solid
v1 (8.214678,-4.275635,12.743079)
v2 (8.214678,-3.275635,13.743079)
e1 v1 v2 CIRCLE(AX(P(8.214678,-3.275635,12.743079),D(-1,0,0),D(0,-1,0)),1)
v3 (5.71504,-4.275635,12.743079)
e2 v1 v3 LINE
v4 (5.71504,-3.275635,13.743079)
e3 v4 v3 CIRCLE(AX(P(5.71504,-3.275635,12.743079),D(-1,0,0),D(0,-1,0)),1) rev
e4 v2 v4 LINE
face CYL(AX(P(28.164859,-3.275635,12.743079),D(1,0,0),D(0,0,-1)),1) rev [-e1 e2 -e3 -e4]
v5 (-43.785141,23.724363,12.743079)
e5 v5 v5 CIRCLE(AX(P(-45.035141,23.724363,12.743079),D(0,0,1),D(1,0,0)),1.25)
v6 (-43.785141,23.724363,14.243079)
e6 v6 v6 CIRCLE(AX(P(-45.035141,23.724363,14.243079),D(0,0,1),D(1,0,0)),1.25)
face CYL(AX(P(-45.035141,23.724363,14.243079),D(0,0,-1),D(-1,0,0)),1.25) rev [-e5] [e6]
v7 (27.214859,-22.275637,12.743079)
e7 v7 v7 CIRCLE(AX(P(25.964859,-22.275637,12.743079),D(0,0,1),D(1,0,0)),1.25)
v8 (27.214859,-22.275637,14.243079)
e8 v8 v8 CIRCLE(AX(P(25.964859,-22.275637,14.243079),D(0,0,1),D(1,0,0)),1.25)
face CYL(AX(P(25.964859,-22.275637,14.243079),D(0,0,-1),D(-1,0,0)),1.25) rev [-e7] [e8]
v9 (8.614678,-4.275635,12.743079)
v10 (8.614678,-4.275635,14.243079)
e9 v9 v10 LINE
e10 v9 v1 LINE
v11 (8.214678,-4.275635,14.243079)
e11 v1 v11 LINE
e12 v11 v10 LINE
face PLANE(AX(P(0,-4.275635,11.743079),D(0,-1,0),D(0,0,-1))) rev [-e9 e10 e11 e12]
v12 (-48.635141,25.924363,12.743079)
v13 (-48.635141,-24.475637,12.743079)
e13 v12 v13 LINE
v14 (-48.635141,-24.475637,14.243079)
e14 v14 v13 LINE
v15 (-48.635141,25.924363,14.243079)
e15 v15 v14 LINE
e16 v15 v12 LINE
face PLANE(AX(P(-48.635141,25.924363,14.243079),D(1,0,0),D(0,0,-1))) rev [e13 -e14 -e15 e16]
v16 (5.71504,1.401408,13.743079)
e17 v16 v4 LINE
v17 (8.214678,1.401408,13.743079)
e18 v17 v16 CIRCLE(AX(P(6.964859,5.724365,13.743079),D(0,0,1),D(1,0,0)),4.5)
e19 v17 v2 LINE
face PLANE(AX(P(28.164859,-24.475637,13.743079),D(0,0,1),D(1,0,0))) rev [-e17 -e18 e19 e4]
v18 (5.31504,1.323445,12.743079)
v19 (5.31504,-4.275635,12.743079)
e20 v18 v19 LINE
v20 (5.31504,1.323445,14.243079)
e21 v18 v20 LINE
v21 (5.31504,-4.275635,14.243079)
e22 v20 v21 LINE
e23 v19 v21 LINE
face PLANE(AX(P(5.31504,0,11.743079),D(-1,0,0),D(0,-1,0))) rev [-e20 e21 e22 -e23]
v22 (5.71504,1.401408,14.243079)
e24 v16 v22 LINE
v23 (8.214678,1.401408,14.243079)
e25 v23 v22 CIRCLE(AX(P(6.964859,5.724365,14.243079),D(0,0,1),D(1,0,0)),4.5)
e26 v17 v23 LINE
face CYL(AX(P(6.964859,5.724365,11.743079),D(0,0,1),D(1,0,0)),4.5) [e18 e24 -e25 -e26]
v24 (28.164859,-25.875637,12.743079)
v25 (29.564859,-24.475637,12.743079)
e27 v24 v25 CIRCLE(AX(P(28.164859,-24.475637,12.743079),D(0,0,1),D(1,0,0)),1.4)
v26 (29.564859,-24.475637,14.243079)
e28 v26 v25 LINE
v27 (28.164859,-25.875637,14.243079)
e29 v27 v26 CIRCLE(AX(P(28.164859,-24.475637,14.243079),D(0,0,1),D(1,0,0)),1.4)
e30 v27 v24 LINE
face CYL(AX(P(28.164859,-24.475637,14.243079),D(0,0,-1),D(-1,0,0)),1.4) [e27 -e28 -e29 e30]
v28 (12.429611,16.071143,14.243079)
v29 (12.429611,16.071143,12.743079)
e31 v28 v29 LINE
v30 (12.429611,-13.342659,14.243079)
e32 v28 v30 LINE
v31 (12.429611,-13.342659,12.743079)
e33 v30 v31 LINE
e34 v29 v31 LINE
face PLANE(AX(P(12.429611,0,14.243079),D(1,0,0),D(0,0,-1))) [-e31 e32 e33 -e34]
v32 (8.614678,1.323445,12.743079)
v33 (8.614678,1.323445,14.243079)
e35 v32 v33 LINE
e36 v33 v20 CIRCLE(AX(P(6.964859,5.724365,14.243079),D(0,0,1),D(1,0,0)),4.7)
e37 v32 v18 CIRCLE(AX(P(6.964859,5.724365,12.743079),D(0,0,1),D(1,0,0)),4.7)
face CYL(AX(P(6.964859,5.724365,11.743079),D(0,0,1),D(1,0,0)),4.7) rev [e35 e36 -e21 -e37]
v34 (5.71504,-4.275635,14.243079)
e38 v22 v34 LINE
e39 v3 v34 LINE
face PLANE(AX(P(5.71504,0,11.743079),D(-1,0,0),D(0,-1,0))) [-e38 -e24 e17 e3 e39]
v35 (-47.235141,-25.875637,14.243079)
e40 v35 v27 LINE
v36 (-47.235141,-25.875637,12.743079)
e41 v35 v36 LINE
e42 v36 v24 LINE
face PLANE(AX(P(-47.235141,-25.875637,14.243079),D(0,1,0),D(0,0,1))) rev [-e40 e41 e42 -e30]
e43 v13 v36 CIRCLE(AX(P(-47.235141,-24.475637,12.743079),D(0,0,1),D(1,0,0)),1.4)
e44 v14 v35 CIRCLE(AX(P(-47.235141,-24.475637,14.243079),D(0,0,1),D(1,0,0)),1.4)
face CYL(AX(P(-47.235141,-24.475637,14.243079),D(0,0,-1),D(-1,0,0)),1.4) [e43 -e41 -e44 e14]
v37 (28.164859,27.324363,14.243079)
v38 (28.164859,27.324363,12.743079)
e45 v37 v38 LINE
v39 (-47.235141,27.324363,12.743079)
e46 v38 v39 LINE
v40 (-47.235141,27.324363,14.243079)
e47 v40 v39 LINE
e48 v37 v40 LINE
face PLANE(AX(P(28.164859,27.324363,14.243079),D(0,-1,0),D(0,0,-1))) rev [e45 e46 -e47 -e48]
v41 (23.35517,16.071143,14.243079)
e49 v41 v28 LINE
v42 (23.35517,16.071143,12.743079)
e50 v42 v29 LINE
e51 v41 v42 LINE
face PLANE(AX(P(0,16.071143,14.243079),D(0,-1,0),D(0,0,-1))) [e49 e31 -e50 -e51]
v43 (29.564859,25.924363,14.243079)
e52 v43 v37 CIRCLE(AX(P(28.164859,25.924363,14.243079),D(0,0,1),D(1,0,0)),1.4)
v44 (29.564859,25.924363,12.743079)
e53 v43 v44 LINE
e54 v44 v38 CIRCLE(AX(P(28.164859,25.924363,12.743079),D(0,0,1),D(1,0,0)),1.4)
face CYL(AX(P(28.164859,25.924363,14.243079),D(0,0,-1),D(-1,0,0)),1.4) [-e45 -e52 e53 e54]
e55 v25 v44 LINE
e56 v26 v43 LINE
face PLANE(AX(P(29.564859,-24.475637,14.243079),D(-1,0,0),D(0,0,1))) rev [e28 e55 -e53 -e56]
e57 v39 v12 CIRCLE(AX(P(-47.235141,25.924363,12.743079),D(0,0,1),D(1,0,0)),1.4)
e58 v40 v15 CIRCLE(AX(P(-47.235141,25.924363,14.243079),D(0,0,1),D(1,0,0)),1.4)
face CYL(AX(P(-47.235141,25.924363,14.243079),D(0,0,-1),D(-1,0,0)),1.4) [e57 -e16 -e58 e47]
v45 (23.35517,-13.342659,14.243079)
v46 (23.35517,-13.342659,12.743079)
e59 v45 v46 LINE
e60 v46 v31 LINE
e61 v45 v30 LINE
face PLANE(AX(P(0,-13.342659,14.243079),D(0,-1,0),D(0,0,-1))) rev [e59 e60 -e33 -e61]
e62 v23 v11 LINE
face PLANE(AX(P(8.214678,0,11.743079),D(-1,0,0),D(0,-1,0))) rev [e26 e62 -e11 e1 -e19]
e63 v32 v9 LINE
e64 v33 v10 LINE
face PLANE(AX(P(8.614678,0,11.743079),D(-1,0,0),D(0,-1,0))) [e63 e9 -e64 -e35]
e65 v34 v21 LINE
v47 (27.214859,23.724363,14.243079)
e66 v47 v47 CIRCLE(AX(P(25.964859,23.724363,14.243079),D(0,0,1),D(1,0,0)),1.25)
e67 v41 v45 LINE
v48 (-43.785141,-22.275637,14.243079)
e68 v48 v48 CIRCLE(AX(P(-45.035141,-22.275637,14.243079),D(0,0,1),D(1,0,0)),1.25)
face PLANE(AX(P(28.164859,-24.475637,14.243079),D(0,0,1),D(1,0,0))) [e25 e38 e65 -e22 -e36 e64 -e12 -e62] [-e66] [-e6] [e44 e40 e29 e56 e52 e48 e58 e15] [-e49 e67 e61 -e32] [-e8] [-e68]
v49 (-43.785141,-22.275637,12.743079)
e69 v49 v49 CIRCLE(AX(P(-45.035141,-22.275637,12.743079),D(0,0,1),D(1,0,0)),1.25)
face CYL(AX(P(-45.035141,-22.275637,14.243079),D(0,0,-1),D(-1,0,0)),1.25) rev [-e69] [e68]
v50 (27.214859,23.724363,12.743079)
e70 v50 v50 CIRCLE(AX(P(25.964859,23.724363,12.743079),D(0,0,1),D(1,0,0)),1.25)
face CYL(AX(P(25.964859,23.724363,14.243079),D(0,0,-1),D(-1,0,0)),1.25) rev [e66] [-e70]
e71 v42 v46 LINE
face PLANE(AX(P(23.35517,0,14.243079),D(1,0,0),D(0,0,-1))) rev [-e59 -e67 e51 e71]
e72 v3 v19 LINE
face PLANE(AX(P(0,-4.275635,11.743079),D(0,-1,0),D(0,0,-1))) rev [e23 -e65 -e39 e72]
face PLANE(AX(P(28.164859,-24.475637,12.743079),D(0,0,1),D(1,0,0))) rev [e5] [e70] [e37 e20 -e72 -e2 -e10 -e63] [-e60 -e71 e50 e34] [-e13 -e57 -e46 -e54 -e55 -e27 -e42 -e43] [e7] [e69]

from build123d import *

# Parameters (mm, degrees)
SKETCH1_R           = 1.25
SKETCH1_W           = 10.925559674
SKETCH1_H           = 29.413801758
BOSS_EXTRUDE1_DEPTH = 1.5
CUT_EXTRUDE1_DEPTH  = 2.5
CUT_EXTRUDE6_START  = -1.5
CUT_EXTRUDE6_DEPTH  = 1
FILLET1_R           = 1


# Read off the part's stored shape, not the designer's step: Cut-Extrude6
with BuildPart() as part:
    # Sketch1 → Boss-Extrude1 (new body)
    with BuildSketch(Plane.XY.offset(12.743078908)):
        with BuildLine():
            Line((29.564858702, -24.475637141), (29.564858702, 25.924362859))
            ThreePointArc((29.564858702, 25.924362859), (29.154808195, 26.914312353), (28.164858702, 27.324362859))
            Line((28.164858702, 27.324362859), (-47.235141298, 27.324362859))
            ThreePointArc((-47.235141298, 27.324362859), (-48.225090792, 26.914312353), (-48.635141298, 25.924362859))
            Line((-48.635141298, 25.924362859), (-48.635141298, -24.475637141))
            ThreePointArc((-48.635141298, -24.475637141), (-48.225090792, -25.465586635), (-47.235141298, -25.875637141))
            Line((-47.235141298, -25.875637141), (28.164858702, -25.875637141))
            ThreePointArc((28.164858702, -25.875637141), (29.154808195, -25.465586635), (29.564858702, -24.475637141))
        make_face()
        with Locations((-45.035141298, -22.275637141)):
            Circle(SKETCH1_R, mode=Mode.SUBTRACT)
        with Locations((-45.035141298, 23.724362859)):
            Circle(SKETCH1_R, mode=Mode.SUBTRACT)
        with Locations((25.964858702, -22.275637141)):
            Circle(SKETCH1_R, mode=Mode.SUBTRACT)
        with Locations((25.964858702, 23.724362859)):
            Circle(SKETCH1_R, mode=Mode.SUBTRACT)
        with Locations((17.892390482, 1.364242189)):
            Rectangle(SKETCH1_W, SKETCH1_H, mode=Mode.SUBTRACT)
    extrude(amount=BOSS_EXTRUDE1_DEPTH)

    # Sketch2 → Cut-Extrude1 (cut)
    with BuildSketch(Plane.XY.offset(14.243078908)):
        with BuildLine():
            ThreePointArc((8.614677666, 1.323444705), (8.416130841, 1.254039367), (8.214677666, 1.193586405))
            Line((8.214677666, 1.193586405), (8.214677666, -4.275635234))
            Line((8.214677666, -4.275635234), (8.614677666, -4.275635234))
            Line((8.614677666, -4.275635234), (8.614677666, 1.323444705))
        make_face()
        with BuildLine():
            ThreePointArc((11.464858702, 5.724364766), (10.684682981, 3.191992888), (8.614677666, 1.537707701))
            Line((8.614677666, 1.537707701), (8.614677666, 1.323444705))
            ThreePointArc((8.614677666, 1.323444705), (10.827768818, 3.047066607), (11.664858702, 5.724364766))
            ThreePointArc((11.664858702, 5.724364766), (4.287560542, 9.587274882), (5.315039737, 1.323444705))
            Line((5.315039737, 1.323444705), (5.315039737, 1.537707701))
            ThreePointArc((5.315039737, 1.537707701), (4.432486823, 9.444189046), (11.464858702, 5.724364766))
        make_face()
        with BuildLine():
            ThreePointArc((8.614677666, 1.537707701), (8.416278493, 1.464860031), (8.214677666, 1.401408306))
            Line((8.214677666, 1.401408306), (8.214677666, 1.193586405))
            ThreePointArc((8.214677666, 1.193586405), (8.416130841, 1.254039367), (8.614677666, 1.323444705))
            Line((8.614677666, 1.323444705), (8.614677666, 1.537707701))
        make_face()
        with BuildLine():
            Line((5.715039737, -4.275635234), (5.715039737, 1.193586405))
            ThreePointArc((5.715039737, 1.193586405), (5.513586562, 1.254039367), (5.315039737, 1.323444705))
            Line((5.315039737, 1.323444705), (5.315039737, -4.275635234))
            Line((5.315039737, -4.275635234), (5.715039737, -4.275635234))
        make_face()
        with BuildLine():
            Line((5.715039737, 1.193586405), (5.715039737, 1.401408306))
            ThreePointArc((5.715039737, 1.401408306), (5.51343891, 1.464860031), (5.315039737, 1.537707701))
            Line((5.315039737, 1.537707701), (5.315039737, 1.323444705))
            ThreePointArc((5.315039737, 1.323444705), (5.513586562, 1.254039367), (5.715039737, 1.193586405))
        make_face()
    extrude(amount=-CUT_EXTRUDE1_DEPTH, mode=Mode.SUBTRACT)

    # Cut-Extrude6 outline → Cut-Extrude6 (cut)
    with BuildSketch(Plane.XY.offset(14.243078908).offset(CUT_EXTRUDE6_START)):
        with BuildLine():
            Line((5.715039737, 1.401408306), (5.715039737, -4.275635234))
            Line((5.715039737, -4.275635234), (8.214677666, -4.275635234))
            Line((8.214677666, -4.275635234), (8.214677666, 1.401408306))
            ThreePointArc((8.214677666, 1.401408306), (6.964858701, 10.224364766), (5.715039737, 1.401408306))
        make_face()
    extrude(amount=CUT_EXTRUDE6_DEPTH, mode=Mode.SUBTRACT)

    # Fillet1
    fillet1_edges = [part.edges().sort_by_distance(p)[0] for p in [
        (6.964858701, -4.275635234, 13.743078908),
    ]]
    fillet(fillet1_edges, radius=FILLET1_R - 0.0001)  # a hair under: the kernel refuses the full size


solid = part.part
